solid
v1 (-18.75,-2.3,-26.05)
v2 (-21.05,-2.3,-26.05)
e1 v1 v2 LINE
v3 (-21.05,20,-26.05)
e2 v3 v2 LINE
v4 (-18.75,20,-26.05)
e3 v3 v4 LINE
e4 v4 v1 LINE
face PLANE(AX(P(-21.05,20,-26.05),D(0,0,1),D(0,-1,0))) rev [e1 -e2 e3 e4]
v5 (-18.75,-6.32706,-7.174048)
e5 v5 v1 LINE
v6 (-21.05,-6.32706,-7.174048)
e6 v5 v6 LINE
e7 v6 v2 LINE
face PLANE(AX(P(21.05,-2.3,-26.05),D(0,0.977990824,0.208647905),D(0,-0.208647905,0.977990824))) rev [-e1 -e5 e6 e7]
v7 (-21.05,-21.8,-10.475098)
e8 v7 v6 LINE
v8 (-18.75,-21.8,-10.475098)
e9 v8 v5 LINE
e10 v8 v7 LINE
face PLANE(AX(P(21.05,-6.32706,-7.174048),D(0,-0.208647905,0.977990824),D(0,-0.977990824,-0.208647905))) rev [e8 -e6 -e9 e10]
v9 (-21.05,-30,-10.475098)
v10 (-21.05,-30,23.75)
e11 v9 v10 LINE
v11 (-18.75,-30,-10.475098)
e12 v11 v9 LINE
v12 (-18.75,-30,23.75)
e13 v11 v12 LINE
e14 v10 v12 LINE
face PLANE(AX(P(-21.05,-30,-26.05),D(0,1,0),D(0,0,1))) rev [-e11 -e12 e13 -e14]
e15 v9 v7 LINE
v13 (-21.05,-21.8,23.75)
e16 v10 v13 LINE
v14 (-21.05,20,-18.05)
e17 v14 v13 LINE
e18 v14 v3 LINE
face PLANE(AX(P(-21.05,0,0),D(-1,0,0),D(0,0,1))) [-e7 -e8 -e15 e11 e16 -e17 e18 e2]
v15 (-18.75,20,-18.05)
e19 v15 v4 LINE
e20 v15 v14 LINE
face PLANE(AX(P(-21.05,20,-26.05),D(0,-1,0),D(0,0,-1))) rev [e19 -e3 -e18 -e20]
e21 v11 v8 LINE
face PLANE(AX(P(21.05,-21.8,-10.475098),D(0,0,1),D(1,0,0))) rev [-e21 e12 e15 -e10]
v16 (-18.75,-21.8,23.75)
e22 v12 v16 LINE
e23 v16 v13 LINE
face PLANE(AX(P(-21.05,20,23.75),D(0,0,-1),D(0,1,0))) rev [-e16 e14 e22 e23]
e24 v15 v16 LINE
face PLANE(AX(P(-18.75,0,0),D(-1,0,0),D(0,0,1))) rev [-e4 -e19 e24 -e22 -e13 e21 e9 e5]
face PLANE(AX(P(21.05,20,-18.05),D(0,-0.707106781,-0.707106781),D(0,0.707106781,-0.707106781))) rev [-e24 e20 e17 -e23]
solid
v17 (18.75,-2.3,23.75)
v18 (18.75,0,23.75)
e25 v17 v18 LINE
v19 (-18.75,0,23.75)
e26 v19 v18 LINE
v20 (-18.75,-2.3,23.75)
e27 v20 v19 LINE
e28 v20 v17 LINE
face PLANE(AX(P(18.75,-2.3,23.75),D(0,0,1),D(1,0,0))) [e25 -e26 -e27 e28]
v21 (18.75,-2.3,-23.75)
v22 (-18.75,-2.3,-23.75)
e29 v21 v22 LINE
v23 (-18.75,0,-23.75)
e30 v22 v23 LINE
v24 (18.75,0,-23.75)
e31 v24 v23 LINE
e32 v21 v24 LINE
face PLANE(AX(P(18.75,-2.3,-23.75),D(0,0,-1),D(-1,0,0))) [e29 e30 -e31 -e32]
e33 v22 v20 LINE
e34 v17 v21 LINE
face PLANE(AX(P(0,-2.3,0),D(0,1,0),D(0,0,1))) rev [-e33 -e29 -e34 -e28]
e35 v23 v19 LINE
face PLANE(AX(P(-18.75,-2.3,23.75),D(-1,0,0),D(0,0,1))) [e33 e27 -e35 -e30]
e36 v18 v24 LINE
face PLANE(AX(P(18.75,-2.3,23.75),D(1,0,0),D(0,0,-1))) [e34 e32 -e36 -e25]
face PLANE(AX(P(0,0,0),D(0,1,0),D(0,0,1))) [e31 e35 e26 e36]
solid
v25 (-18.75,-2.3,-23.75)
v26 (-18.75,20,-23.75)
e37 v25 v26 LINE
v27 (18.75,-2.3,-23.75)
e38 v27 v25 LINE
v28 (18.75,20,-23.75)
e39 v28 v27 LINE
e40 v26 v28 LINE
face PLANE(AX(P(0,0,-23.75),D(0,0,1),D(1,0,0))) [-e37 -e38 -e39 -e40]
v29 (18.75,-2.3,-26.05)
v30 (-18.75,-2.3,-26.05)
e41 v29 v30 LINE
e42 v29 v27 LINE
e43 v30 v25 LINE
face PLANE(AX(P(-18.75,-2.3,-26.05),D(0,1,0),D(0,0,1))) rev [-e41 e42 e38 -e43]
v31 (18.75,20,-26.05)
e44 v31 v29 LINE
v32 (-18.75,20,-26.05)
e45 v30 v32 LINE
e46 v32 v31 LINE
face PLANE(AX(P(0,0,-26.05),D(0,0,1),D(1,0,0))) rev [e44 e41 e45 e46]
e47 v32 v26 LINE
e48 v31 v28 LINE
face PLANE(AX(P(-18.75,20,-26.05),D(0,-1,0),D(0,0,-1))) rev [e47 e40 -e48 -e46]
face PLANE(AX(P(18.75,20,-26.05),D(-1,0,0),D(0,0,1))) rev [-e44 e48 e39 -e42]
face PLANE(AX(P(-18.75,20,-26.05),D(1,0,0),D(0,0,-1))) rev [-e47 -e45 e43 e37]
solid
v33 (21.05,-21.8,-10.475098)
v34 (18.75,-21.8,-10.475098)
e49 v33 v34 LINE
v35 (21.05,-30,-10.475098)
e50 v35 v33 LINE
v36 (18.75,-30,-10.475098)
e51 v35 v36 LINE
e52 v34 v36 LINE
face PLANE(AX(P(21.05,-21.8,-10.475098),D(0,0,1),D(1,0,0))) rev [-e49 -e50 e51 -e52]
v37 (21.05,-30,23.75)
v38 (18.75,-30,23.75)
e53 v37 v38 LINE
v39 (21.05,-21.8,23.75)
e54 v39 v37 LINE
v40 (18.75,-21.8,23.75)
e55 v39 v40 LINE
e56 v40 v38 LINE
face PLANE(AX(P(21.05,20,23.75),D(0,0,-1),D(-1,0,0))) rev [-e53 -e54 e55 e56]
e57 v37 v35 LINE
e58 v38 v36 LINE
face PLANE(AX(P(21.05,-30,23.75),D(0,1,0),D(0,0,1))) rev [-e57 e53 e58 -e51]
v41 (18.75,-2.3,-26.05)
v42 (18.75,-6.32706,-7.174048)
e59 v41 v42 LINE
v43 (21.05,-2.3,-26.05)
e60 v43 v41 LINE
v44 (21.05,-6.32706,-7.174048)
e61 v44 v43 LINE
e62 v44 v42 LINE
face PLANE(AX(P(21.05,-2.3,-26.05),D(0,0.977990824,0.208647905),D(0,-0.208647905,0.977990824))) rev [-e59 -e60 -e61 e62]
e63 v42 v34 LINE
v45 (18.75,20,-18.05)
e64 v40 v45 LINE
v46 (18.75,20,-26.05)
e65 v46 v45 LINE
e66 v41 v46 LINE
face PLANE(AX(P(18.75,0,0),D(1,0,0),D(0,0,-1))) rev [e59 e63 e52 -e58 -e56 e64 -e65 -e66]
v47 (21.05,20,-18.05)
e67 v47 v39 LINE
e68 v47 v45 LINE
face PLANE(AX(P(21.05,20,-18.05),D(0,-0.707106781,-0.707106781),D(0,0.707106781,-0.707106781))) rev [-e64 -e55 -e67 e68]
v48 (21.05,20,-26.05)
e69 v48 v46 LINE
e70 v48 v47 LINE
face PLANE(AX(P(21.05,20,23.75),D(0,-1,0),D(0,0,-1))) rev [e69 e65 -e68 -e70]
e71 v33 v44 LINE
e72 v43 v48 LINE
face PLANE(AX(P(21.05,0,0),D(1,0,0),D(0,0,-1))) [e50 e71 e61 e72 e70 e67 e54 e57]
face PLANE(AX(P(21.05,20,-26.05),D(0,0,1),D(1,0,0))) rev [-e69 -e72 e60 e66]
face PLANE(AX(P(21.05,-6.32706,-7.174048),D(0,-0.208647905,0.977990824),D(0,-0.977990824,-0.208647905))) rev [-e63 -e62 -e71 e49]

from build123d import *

# Parameters (mm, degrees)
SKETCH1_W               = 37.5
SKETCH1_H               = 47.5
BASE_FLANGE1_DEPTH      = 2.3
SKETCH9_W               = 49.8
SKETCH9_H               = 50
BASE_FLANGE2_DEPTH      = 2.3
SKETCH12_W              = 37.5
SKETCH12_H              = 22.3
BASE_FLANGE3_DEPTH      = 2.3
SKETCH15_W              = 49.8
SKETCH15_H              = 50
BASE_FLANGE4_DEPTH      = 2.3
CUT_EXTRUDE1_DEPTH      = 58.887930521
CUT_EXTRUDE1_DEPTH_BACK = 58.887930521
CUT_EXTRUDE2_DEPTH      = 58.887930521
CUT_EXTRUDE2_DEPTH_BACK = 58.887930521


# Sheet-metal steps are written as plain solids
with BuildPart() as part:
    # Sketch1 → Base-Flange1 (new body)
    with BuildSketch(Plane(origin=(0, 0, 0), x_dir=(1, 0, 0), z_dir=(0, 1, 0))):
        Rectangle(SKETCH1_W, SKETCH1_H)
    extrude(amount=-BASE_FLANGE1_DEPTH)


with BuildPart() as body_2:
    # Sketch9 → Base-Flange2 (new body)
    with BuildSketch(Plane.ZY.offset(18.75)):
        with Locations((-1.15, -5)):
            Rectangle(SKETCH9_W, SKETCH9_H)
    extrude(amount=BASE_FLANGE2_DEPTH)


with BuildPart() as body_3:
    # Sketch12 → Base-Flange3 (new body)
    with BuildSketch(Plane(origin=(0, 0, -23.75), x_dir=(-1, 0, 0), z_dir=(0, 0, -1))):
        with Locations((0, 8.85)):
            Rectangle(SKETCH12_W, SKETCH12_H)
    extrude(amount=BASE_FLANGE3_DEPTH)


with BuildPart() as body_4:
    # Sketch15 → Base-Flange4 (new body)
    with BuildSketch(Plane(origin=(18.75, 0, 0), x_dir=(0, 0, -1), z_dir=(1, 0, 0))):
        with Locations((1.15, -5)):
            Rectangle(SKETCH15_W, SKETCH15_H)
    extrude(amount=BASE_FLANGE4_DEPTH)


with BuildPart() as cut_extrude1_tool:
    # Sketch18 → Cut-Extrude1 (new, two sides: drawn at the far end of the back side and taken through both)
    with BuildSketch(Plane.ZY.offset(21.05).offset(-CUT_EXTRUDE1_DEPTH_BACK)):
        Polygon((-18.05, 20), (23.75, -21.8), (23.75, 20), align=None)
    extrude(amount=CUT_EXTRUDE1_DEPTH + CUT_EXTRUDE1_DEPTH_BACK)


with BuildPart() as body_2_1:
    add(body_2.part)

    # Cut-Extrude1: cut by cut_extrude1_tool
    add(cut_extrude1_tool.part, mode=Mode.SUBTRACT)


with BuildPart() as body_4_1:
    add(body_4.part)

    # Cut-Extrude1: cut by cut_extrude1_tool
    add(cut_extrude1_tool.part, mode=Mode.SUBTRACT)


with BuildPart() as cut_extrude2_tool:
    # Sketch19 → Cut-Extrude2 (new, two sides: drawn at the far end of the back side and taken through both)
    with BuildSketch(Plane.ZY.offset(21.05).offset(-CUT_EXTRUDE2_DEPTH_BACK)):
        Polygon((-26.05, -2.3), (-7.174048239, -6.32706006), (-10.475098127, -21.8), (-10.475098127, -30), (-26.05, -30), align=None)
    extrude(amount=CUT_EXTRUDE2_DEPTH + CUT_EXTRUDE2_DEPTH_BACK)


with BuildPart() as body_2_2:
    add(body_2_1.part)

    # Cut-Extrude2: cut by cut_extrude2_tool
    add(cut_extrude2_tool.part, mode=Mode.SUBTRACT)


with BuildPart() as body_4_2:
    add(body_4_1.part)

    # Cut-Extrude2: cut by cut_extrude2_tool
    add(cut_extrude2_tool.part, mode=Mode.SUBTRACT)


solid = Compound([part.part, body_3.part, body_2_2.part, body_4_2.part])
